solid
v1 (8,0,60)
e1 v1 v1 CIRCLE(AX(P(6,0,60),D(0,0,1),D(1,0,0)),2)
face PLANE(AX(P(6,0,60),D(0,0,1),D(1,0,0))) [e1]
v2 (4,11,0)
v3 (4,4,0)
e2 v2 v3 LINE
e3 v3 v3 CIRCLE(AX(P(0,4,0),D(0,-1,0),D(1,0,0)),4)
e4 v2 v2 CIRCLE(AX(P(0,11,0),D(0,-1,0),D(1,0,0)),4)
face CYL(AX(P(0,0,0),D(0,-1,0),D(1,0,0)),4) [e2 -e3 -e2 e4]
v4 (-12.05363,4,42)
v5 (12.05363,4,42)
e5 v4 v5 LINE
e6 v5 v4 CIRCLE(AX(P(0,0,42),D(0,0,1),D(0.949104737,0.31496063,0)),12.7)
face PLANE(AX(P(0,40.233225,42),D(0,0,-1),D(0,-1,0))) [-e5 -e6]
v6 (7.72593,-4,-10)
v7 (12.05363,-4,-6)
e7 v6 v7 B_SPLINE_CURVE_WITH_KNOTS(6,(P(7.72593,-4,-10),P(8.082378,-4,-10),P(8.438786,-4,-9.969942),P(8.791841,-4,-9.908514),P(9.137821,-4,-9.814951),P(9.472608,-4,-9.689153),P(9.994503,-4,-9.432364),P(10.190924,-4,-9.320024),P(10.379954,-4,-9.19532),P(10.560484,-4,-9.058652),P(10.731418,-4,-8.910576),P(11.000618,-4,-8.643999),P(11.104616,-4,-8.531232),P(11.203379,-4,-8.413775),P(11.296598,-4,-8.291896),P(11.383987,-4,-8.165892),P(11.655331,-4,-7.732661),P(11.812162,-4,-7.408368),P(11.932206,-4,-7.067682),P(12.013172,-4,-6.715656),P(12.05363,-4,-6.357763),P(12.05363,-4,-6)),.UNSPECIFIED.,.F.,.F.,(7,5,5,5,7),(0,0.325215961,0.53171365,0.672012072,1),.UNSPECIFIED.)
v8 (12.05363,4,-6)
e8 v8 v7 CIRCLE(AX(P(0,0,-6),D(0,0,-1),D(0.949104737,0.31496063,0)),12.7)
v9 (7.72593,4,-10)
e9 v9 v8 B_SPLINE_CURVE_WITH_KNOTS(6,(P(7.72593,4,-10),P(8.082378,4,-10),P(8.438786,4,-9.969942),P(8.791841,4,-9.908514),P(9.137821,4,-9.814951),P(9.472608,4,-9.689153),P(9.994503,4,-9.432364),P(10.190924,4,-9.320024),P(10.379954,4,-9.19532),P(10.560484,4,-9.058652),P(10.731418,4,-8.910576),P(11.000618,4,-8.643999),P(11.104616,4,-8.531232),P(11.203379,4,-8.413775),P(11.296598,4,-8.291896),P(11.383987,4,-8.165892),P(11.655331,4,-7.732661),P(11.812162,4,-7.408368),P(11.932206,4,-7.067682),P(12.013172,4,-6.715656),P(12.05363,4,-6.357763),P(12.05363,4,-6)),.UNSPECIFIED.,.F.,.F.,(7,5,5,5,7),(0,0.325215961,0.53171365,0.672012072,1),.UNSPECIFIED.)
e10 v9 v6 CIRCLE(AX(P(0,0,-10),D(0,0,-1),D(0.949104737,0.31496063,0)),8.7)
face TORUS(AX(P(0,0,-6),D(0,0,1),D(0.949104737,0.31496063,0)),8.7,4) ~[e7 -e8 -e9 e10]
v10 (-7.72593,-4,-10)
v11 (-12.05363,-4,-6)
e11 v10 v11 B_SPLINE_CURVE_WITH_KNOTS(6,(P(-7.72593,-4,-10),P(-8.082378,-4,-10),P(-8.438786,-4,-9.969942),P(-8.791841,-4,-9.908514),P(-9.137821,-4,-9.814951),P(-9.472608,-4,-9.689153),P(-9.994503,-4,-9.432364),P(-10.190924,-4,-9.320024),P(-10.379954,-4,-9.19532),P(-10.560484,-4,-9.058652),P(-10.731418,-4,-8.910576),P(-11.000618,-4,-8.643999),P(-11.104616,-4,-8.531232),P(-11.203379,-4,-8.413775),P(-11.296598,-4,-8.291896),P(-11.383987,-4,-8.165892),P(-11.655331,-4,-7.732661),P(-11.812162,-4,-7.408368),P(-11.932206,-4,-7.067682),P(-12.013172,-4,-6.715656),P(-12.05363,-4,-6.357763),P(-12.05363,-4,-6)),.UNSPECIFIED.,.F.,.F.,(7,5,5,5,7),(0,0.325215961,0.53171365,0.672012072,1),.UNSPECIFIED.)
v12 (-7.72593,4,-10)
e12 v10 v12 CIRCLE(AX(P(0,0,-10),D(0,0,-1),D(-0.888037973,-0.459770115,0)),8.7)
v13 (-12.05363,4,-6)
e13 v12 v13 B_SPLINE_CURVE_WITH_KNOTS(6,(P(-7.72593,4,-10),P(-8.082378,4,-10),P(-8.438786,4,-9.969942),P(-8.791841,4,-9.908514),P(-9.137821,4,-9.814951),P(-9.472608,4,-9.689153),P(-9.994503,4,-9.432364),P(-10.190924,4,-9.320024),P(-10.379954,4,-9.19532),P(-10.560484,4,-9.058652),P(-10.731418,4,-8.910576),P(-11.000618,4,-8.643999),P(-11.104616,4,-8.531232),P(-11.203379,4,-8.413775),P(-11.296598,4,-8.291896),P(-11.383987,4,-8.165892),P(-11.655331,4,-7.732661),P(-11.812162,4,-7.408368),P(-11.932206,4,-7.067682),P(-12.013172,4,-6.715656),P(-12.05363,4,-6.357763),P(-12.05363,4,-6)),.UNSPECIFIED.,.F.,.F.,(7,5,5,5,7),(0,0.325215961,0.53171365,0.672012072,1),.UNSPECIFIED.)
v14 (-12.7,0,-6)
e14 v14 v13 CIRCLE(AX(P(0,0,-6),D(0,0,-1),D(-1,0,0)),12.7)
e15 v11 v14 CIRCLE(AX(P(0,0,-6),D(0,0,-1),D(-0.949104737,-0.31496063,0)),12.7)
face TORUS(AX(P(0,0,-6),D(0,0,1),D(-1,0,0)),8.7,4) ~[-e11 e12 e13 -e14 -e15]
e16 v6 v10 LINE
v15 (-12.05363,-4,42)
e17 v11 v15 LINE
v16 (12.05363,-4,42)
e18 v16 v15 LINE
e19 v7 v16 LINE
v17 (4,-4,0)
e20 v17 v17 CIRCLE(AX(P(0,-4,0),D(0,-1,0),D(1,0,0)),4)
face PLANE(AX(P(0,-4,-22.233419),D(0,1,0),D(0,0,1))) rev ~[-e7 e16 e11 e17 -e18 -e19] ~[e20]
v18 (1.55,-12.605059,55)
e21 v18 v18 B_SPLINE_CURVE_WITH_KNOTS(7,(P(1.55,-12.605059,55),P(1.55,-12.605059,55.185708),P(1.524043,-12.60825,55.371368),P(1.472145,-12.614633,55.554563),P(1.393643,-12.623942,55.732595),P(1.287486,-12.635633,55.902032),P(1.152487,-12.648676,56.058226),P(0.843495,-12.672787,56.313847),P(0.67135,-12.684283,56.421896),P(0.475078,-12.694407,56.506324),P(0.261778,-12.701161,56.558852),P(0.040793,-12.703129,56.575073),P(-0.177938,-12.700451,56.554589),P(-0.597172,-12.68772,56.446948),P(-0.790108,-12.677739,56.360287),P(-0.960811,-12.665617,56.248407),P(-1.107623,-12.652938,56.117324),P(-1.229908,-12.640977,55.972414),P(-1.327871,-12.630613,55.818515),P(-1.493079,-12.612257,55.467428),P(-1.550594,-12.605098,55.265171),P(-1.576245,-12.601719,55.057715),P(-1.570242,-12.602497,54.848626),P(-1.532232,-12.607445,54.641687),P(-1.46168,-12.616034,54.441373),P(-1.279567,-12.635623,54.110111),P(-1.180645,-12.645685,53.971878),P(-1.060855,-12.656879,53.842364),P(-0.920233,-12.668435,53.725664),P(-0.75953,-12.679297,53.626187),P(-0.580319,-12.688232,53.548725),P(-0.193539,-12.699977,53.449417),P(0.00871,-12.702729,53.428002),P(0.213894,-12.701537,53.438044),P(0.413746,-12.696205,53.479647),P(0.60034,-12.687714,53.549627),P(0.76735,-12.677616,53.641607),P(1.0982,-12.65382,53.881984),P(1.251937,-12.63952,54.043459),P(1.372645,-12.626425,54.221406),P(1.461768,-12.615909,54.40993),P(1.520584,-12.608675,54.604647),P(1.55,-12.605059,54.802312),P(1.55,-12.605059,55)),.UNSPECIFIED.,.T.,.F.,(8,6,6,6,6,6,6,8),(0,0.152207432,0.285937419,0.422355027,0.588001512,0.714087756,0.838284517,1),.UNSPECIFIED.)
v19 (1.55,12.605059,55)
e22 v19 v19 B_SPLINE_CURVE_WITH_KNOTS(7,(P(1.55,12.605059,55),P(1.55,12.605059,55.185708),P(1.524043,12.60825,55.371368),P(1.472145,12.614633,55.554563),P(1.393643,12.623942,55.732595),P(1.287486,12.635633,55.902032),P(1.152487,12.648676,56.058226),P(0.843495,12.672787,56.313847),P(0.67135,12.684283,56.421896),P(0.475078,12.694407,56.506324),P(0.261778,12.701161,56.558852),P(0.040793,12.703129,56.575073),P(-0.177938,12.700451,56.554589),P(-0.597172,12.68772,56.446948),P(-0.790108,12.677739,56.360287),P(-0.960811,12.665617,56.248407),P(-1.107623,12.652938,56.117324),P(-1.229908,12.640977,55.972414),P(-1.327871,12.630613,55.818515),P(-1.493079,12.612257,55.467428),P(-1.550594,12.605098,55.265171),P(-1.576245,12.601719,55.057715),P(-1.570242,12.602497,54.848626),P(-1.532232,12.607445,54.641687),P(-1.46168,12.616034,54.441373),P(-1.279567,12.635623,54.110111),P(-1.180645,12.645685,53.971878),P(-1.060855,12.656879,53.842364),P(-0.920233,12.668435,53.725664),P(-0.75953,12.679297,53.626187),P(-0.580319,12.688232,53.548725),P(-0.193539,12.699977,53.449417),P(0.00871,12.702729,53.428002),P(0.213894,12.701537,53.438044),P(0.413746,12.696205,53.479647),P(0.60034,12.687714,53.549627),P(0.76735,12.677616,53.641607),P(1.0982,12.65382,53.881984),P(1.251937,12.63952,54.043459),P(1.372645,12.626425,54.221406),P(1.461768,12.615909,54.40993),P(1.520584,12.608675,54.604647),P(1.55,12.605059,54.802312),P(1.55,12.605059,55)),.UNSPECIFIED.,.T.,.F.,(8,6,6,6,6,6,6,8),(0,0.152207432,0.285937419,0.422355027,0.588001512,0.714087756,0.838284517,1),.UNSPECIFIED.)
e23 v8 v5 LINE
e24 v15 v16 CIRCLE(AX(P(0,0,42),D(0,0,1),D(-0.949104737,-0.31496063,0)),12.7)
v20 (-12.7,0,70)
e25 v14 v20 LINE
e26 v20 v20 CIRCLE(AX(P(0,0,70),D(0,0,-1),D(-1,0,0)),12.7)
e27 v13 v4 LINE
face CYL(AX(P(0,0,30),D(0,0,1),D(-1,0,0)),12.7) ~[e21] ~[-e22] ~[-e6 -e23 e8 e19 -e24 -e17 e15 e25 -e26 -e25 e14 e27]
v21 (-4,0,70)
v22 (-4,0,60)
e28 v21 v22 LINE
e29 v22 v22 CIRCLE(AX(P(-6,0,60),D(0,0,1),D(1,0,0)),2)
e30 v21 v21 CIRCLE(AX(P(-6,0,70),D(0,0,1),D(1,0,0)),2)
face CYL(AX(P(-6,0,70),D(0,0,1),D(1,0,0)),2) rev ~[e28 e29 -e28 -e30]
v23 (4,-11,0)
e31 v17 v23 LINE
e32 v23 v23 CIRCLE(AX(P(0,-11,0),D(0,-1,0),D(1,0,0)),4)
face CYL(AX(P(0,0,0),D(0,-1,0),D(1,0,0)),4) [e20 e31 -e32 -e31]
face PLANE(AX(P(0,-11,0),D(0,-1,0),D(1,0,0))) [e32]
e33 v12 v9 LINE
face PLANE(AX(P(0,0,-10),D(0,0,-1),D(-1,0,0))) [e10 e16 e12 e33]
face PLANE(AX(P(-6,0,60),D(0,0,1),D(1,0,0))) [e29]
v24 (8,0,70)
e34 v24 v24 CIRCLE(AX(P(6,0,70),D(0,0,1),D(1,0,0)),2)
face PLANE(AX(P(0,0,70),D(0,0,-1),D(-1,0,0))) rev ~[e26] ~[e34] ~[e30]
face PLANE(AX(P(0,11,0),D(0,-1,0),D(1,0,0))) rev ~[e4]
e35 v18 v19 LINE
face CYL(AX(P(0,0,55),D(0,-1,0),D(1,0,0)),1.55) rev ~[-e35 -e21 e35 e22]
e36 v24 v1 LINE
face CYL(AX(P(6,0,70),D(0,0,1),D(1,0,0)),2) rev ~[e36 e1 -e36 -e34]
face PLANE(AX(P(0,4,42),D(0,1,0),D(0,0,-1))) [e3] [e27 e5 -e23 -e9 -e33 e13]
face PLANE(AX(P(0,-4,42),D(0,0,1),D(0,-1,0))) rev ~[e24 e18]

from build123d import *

# Parameters (mm, degrees)
F0_W           = 12.7
F0_H           = 80
F3_DEPTH       = 12.701
F3_DEPTH_BACK  = 12.701
F4_R           = 4
F5_DEPTH       = 11
F6_R           = 2
F7_DEPTH       = 10
F8_R           = 4
F9_R           = 1.55
F10_DEPTH      = 12.701
F10_DEPTH_BACK = 12.701


with BuildPart() as f1:
    # F0 (on Front) → F1 (revolve)
    with BuildSketch(Plane.XZ):
        with Locations((-6.35, 30)):
            Rectangle(F0_W, F0_H)
    revolve(axis=Axis((0, 0, 30), (0, 0, -1)))

    # F2 (on Right) → F3 (cut, two sides)
    with BuildSketch(Plane.YZ) as f3_sk:
        Polygon((-4, -10), (-4, 42), (-29.7404956073, 42), (-29.7404956073, -22.2334191203), (-4, -22.2334191203), align=None)
        Polygon((40.2332246304, 42), (4, 42), (4, -10), (4, -16.8698504567), (40.2332246304, -16.8698504567), align=None)
    extrude(amount=-F3_DEPTH, mode=Mode.SUBTRACT)
    extrude(f3_sk.sketch, amount=F3_DEPTH_BACK, mode=Mode.SUBTRACT)

    # F4 (on Front) → F5 (join, symmetric)
    with BuildSketch(Plane.XZ):
        Circle(F4_R)
    extrude(amount=F5_DEPTH, both=True)

    # F6 (on face) → F7 (cut)
    with BuildSketch(Plane.XY.offset(70)):
        with Locations((-6, 0)):
            Circle(F6_R)
        with Locations((6, 0)):
            Circle(F6_R)
    extrude(amount=-F7_DEPTH, mode=Mode.SUBTRACT)

    # F8
    f8_edges = [f1.edges().sort_by_distance(p)[0] for p in [
        (12.7, 0, -10),
        (-12.537366, -2.025944, -10),
        (-12.537366, 2.025944, -10),
    ]]
    fillet(f8_edges, radius=F8_R)

    # F9 (on Front) → F10 (cut, two sides)
    with BuildSketch(Plane.XZ) as f10_sk:
        with Locations((0, 55)):
            Circle(F9_R)
    extrude(amount=F10_DEPTH, mode=Mode.SUBTRACT)
    extrude(f10_sk.sketch, amount=-F10_DEPTH_BACK, mode=Mode.SUBTRACT)


solid = f1.part
